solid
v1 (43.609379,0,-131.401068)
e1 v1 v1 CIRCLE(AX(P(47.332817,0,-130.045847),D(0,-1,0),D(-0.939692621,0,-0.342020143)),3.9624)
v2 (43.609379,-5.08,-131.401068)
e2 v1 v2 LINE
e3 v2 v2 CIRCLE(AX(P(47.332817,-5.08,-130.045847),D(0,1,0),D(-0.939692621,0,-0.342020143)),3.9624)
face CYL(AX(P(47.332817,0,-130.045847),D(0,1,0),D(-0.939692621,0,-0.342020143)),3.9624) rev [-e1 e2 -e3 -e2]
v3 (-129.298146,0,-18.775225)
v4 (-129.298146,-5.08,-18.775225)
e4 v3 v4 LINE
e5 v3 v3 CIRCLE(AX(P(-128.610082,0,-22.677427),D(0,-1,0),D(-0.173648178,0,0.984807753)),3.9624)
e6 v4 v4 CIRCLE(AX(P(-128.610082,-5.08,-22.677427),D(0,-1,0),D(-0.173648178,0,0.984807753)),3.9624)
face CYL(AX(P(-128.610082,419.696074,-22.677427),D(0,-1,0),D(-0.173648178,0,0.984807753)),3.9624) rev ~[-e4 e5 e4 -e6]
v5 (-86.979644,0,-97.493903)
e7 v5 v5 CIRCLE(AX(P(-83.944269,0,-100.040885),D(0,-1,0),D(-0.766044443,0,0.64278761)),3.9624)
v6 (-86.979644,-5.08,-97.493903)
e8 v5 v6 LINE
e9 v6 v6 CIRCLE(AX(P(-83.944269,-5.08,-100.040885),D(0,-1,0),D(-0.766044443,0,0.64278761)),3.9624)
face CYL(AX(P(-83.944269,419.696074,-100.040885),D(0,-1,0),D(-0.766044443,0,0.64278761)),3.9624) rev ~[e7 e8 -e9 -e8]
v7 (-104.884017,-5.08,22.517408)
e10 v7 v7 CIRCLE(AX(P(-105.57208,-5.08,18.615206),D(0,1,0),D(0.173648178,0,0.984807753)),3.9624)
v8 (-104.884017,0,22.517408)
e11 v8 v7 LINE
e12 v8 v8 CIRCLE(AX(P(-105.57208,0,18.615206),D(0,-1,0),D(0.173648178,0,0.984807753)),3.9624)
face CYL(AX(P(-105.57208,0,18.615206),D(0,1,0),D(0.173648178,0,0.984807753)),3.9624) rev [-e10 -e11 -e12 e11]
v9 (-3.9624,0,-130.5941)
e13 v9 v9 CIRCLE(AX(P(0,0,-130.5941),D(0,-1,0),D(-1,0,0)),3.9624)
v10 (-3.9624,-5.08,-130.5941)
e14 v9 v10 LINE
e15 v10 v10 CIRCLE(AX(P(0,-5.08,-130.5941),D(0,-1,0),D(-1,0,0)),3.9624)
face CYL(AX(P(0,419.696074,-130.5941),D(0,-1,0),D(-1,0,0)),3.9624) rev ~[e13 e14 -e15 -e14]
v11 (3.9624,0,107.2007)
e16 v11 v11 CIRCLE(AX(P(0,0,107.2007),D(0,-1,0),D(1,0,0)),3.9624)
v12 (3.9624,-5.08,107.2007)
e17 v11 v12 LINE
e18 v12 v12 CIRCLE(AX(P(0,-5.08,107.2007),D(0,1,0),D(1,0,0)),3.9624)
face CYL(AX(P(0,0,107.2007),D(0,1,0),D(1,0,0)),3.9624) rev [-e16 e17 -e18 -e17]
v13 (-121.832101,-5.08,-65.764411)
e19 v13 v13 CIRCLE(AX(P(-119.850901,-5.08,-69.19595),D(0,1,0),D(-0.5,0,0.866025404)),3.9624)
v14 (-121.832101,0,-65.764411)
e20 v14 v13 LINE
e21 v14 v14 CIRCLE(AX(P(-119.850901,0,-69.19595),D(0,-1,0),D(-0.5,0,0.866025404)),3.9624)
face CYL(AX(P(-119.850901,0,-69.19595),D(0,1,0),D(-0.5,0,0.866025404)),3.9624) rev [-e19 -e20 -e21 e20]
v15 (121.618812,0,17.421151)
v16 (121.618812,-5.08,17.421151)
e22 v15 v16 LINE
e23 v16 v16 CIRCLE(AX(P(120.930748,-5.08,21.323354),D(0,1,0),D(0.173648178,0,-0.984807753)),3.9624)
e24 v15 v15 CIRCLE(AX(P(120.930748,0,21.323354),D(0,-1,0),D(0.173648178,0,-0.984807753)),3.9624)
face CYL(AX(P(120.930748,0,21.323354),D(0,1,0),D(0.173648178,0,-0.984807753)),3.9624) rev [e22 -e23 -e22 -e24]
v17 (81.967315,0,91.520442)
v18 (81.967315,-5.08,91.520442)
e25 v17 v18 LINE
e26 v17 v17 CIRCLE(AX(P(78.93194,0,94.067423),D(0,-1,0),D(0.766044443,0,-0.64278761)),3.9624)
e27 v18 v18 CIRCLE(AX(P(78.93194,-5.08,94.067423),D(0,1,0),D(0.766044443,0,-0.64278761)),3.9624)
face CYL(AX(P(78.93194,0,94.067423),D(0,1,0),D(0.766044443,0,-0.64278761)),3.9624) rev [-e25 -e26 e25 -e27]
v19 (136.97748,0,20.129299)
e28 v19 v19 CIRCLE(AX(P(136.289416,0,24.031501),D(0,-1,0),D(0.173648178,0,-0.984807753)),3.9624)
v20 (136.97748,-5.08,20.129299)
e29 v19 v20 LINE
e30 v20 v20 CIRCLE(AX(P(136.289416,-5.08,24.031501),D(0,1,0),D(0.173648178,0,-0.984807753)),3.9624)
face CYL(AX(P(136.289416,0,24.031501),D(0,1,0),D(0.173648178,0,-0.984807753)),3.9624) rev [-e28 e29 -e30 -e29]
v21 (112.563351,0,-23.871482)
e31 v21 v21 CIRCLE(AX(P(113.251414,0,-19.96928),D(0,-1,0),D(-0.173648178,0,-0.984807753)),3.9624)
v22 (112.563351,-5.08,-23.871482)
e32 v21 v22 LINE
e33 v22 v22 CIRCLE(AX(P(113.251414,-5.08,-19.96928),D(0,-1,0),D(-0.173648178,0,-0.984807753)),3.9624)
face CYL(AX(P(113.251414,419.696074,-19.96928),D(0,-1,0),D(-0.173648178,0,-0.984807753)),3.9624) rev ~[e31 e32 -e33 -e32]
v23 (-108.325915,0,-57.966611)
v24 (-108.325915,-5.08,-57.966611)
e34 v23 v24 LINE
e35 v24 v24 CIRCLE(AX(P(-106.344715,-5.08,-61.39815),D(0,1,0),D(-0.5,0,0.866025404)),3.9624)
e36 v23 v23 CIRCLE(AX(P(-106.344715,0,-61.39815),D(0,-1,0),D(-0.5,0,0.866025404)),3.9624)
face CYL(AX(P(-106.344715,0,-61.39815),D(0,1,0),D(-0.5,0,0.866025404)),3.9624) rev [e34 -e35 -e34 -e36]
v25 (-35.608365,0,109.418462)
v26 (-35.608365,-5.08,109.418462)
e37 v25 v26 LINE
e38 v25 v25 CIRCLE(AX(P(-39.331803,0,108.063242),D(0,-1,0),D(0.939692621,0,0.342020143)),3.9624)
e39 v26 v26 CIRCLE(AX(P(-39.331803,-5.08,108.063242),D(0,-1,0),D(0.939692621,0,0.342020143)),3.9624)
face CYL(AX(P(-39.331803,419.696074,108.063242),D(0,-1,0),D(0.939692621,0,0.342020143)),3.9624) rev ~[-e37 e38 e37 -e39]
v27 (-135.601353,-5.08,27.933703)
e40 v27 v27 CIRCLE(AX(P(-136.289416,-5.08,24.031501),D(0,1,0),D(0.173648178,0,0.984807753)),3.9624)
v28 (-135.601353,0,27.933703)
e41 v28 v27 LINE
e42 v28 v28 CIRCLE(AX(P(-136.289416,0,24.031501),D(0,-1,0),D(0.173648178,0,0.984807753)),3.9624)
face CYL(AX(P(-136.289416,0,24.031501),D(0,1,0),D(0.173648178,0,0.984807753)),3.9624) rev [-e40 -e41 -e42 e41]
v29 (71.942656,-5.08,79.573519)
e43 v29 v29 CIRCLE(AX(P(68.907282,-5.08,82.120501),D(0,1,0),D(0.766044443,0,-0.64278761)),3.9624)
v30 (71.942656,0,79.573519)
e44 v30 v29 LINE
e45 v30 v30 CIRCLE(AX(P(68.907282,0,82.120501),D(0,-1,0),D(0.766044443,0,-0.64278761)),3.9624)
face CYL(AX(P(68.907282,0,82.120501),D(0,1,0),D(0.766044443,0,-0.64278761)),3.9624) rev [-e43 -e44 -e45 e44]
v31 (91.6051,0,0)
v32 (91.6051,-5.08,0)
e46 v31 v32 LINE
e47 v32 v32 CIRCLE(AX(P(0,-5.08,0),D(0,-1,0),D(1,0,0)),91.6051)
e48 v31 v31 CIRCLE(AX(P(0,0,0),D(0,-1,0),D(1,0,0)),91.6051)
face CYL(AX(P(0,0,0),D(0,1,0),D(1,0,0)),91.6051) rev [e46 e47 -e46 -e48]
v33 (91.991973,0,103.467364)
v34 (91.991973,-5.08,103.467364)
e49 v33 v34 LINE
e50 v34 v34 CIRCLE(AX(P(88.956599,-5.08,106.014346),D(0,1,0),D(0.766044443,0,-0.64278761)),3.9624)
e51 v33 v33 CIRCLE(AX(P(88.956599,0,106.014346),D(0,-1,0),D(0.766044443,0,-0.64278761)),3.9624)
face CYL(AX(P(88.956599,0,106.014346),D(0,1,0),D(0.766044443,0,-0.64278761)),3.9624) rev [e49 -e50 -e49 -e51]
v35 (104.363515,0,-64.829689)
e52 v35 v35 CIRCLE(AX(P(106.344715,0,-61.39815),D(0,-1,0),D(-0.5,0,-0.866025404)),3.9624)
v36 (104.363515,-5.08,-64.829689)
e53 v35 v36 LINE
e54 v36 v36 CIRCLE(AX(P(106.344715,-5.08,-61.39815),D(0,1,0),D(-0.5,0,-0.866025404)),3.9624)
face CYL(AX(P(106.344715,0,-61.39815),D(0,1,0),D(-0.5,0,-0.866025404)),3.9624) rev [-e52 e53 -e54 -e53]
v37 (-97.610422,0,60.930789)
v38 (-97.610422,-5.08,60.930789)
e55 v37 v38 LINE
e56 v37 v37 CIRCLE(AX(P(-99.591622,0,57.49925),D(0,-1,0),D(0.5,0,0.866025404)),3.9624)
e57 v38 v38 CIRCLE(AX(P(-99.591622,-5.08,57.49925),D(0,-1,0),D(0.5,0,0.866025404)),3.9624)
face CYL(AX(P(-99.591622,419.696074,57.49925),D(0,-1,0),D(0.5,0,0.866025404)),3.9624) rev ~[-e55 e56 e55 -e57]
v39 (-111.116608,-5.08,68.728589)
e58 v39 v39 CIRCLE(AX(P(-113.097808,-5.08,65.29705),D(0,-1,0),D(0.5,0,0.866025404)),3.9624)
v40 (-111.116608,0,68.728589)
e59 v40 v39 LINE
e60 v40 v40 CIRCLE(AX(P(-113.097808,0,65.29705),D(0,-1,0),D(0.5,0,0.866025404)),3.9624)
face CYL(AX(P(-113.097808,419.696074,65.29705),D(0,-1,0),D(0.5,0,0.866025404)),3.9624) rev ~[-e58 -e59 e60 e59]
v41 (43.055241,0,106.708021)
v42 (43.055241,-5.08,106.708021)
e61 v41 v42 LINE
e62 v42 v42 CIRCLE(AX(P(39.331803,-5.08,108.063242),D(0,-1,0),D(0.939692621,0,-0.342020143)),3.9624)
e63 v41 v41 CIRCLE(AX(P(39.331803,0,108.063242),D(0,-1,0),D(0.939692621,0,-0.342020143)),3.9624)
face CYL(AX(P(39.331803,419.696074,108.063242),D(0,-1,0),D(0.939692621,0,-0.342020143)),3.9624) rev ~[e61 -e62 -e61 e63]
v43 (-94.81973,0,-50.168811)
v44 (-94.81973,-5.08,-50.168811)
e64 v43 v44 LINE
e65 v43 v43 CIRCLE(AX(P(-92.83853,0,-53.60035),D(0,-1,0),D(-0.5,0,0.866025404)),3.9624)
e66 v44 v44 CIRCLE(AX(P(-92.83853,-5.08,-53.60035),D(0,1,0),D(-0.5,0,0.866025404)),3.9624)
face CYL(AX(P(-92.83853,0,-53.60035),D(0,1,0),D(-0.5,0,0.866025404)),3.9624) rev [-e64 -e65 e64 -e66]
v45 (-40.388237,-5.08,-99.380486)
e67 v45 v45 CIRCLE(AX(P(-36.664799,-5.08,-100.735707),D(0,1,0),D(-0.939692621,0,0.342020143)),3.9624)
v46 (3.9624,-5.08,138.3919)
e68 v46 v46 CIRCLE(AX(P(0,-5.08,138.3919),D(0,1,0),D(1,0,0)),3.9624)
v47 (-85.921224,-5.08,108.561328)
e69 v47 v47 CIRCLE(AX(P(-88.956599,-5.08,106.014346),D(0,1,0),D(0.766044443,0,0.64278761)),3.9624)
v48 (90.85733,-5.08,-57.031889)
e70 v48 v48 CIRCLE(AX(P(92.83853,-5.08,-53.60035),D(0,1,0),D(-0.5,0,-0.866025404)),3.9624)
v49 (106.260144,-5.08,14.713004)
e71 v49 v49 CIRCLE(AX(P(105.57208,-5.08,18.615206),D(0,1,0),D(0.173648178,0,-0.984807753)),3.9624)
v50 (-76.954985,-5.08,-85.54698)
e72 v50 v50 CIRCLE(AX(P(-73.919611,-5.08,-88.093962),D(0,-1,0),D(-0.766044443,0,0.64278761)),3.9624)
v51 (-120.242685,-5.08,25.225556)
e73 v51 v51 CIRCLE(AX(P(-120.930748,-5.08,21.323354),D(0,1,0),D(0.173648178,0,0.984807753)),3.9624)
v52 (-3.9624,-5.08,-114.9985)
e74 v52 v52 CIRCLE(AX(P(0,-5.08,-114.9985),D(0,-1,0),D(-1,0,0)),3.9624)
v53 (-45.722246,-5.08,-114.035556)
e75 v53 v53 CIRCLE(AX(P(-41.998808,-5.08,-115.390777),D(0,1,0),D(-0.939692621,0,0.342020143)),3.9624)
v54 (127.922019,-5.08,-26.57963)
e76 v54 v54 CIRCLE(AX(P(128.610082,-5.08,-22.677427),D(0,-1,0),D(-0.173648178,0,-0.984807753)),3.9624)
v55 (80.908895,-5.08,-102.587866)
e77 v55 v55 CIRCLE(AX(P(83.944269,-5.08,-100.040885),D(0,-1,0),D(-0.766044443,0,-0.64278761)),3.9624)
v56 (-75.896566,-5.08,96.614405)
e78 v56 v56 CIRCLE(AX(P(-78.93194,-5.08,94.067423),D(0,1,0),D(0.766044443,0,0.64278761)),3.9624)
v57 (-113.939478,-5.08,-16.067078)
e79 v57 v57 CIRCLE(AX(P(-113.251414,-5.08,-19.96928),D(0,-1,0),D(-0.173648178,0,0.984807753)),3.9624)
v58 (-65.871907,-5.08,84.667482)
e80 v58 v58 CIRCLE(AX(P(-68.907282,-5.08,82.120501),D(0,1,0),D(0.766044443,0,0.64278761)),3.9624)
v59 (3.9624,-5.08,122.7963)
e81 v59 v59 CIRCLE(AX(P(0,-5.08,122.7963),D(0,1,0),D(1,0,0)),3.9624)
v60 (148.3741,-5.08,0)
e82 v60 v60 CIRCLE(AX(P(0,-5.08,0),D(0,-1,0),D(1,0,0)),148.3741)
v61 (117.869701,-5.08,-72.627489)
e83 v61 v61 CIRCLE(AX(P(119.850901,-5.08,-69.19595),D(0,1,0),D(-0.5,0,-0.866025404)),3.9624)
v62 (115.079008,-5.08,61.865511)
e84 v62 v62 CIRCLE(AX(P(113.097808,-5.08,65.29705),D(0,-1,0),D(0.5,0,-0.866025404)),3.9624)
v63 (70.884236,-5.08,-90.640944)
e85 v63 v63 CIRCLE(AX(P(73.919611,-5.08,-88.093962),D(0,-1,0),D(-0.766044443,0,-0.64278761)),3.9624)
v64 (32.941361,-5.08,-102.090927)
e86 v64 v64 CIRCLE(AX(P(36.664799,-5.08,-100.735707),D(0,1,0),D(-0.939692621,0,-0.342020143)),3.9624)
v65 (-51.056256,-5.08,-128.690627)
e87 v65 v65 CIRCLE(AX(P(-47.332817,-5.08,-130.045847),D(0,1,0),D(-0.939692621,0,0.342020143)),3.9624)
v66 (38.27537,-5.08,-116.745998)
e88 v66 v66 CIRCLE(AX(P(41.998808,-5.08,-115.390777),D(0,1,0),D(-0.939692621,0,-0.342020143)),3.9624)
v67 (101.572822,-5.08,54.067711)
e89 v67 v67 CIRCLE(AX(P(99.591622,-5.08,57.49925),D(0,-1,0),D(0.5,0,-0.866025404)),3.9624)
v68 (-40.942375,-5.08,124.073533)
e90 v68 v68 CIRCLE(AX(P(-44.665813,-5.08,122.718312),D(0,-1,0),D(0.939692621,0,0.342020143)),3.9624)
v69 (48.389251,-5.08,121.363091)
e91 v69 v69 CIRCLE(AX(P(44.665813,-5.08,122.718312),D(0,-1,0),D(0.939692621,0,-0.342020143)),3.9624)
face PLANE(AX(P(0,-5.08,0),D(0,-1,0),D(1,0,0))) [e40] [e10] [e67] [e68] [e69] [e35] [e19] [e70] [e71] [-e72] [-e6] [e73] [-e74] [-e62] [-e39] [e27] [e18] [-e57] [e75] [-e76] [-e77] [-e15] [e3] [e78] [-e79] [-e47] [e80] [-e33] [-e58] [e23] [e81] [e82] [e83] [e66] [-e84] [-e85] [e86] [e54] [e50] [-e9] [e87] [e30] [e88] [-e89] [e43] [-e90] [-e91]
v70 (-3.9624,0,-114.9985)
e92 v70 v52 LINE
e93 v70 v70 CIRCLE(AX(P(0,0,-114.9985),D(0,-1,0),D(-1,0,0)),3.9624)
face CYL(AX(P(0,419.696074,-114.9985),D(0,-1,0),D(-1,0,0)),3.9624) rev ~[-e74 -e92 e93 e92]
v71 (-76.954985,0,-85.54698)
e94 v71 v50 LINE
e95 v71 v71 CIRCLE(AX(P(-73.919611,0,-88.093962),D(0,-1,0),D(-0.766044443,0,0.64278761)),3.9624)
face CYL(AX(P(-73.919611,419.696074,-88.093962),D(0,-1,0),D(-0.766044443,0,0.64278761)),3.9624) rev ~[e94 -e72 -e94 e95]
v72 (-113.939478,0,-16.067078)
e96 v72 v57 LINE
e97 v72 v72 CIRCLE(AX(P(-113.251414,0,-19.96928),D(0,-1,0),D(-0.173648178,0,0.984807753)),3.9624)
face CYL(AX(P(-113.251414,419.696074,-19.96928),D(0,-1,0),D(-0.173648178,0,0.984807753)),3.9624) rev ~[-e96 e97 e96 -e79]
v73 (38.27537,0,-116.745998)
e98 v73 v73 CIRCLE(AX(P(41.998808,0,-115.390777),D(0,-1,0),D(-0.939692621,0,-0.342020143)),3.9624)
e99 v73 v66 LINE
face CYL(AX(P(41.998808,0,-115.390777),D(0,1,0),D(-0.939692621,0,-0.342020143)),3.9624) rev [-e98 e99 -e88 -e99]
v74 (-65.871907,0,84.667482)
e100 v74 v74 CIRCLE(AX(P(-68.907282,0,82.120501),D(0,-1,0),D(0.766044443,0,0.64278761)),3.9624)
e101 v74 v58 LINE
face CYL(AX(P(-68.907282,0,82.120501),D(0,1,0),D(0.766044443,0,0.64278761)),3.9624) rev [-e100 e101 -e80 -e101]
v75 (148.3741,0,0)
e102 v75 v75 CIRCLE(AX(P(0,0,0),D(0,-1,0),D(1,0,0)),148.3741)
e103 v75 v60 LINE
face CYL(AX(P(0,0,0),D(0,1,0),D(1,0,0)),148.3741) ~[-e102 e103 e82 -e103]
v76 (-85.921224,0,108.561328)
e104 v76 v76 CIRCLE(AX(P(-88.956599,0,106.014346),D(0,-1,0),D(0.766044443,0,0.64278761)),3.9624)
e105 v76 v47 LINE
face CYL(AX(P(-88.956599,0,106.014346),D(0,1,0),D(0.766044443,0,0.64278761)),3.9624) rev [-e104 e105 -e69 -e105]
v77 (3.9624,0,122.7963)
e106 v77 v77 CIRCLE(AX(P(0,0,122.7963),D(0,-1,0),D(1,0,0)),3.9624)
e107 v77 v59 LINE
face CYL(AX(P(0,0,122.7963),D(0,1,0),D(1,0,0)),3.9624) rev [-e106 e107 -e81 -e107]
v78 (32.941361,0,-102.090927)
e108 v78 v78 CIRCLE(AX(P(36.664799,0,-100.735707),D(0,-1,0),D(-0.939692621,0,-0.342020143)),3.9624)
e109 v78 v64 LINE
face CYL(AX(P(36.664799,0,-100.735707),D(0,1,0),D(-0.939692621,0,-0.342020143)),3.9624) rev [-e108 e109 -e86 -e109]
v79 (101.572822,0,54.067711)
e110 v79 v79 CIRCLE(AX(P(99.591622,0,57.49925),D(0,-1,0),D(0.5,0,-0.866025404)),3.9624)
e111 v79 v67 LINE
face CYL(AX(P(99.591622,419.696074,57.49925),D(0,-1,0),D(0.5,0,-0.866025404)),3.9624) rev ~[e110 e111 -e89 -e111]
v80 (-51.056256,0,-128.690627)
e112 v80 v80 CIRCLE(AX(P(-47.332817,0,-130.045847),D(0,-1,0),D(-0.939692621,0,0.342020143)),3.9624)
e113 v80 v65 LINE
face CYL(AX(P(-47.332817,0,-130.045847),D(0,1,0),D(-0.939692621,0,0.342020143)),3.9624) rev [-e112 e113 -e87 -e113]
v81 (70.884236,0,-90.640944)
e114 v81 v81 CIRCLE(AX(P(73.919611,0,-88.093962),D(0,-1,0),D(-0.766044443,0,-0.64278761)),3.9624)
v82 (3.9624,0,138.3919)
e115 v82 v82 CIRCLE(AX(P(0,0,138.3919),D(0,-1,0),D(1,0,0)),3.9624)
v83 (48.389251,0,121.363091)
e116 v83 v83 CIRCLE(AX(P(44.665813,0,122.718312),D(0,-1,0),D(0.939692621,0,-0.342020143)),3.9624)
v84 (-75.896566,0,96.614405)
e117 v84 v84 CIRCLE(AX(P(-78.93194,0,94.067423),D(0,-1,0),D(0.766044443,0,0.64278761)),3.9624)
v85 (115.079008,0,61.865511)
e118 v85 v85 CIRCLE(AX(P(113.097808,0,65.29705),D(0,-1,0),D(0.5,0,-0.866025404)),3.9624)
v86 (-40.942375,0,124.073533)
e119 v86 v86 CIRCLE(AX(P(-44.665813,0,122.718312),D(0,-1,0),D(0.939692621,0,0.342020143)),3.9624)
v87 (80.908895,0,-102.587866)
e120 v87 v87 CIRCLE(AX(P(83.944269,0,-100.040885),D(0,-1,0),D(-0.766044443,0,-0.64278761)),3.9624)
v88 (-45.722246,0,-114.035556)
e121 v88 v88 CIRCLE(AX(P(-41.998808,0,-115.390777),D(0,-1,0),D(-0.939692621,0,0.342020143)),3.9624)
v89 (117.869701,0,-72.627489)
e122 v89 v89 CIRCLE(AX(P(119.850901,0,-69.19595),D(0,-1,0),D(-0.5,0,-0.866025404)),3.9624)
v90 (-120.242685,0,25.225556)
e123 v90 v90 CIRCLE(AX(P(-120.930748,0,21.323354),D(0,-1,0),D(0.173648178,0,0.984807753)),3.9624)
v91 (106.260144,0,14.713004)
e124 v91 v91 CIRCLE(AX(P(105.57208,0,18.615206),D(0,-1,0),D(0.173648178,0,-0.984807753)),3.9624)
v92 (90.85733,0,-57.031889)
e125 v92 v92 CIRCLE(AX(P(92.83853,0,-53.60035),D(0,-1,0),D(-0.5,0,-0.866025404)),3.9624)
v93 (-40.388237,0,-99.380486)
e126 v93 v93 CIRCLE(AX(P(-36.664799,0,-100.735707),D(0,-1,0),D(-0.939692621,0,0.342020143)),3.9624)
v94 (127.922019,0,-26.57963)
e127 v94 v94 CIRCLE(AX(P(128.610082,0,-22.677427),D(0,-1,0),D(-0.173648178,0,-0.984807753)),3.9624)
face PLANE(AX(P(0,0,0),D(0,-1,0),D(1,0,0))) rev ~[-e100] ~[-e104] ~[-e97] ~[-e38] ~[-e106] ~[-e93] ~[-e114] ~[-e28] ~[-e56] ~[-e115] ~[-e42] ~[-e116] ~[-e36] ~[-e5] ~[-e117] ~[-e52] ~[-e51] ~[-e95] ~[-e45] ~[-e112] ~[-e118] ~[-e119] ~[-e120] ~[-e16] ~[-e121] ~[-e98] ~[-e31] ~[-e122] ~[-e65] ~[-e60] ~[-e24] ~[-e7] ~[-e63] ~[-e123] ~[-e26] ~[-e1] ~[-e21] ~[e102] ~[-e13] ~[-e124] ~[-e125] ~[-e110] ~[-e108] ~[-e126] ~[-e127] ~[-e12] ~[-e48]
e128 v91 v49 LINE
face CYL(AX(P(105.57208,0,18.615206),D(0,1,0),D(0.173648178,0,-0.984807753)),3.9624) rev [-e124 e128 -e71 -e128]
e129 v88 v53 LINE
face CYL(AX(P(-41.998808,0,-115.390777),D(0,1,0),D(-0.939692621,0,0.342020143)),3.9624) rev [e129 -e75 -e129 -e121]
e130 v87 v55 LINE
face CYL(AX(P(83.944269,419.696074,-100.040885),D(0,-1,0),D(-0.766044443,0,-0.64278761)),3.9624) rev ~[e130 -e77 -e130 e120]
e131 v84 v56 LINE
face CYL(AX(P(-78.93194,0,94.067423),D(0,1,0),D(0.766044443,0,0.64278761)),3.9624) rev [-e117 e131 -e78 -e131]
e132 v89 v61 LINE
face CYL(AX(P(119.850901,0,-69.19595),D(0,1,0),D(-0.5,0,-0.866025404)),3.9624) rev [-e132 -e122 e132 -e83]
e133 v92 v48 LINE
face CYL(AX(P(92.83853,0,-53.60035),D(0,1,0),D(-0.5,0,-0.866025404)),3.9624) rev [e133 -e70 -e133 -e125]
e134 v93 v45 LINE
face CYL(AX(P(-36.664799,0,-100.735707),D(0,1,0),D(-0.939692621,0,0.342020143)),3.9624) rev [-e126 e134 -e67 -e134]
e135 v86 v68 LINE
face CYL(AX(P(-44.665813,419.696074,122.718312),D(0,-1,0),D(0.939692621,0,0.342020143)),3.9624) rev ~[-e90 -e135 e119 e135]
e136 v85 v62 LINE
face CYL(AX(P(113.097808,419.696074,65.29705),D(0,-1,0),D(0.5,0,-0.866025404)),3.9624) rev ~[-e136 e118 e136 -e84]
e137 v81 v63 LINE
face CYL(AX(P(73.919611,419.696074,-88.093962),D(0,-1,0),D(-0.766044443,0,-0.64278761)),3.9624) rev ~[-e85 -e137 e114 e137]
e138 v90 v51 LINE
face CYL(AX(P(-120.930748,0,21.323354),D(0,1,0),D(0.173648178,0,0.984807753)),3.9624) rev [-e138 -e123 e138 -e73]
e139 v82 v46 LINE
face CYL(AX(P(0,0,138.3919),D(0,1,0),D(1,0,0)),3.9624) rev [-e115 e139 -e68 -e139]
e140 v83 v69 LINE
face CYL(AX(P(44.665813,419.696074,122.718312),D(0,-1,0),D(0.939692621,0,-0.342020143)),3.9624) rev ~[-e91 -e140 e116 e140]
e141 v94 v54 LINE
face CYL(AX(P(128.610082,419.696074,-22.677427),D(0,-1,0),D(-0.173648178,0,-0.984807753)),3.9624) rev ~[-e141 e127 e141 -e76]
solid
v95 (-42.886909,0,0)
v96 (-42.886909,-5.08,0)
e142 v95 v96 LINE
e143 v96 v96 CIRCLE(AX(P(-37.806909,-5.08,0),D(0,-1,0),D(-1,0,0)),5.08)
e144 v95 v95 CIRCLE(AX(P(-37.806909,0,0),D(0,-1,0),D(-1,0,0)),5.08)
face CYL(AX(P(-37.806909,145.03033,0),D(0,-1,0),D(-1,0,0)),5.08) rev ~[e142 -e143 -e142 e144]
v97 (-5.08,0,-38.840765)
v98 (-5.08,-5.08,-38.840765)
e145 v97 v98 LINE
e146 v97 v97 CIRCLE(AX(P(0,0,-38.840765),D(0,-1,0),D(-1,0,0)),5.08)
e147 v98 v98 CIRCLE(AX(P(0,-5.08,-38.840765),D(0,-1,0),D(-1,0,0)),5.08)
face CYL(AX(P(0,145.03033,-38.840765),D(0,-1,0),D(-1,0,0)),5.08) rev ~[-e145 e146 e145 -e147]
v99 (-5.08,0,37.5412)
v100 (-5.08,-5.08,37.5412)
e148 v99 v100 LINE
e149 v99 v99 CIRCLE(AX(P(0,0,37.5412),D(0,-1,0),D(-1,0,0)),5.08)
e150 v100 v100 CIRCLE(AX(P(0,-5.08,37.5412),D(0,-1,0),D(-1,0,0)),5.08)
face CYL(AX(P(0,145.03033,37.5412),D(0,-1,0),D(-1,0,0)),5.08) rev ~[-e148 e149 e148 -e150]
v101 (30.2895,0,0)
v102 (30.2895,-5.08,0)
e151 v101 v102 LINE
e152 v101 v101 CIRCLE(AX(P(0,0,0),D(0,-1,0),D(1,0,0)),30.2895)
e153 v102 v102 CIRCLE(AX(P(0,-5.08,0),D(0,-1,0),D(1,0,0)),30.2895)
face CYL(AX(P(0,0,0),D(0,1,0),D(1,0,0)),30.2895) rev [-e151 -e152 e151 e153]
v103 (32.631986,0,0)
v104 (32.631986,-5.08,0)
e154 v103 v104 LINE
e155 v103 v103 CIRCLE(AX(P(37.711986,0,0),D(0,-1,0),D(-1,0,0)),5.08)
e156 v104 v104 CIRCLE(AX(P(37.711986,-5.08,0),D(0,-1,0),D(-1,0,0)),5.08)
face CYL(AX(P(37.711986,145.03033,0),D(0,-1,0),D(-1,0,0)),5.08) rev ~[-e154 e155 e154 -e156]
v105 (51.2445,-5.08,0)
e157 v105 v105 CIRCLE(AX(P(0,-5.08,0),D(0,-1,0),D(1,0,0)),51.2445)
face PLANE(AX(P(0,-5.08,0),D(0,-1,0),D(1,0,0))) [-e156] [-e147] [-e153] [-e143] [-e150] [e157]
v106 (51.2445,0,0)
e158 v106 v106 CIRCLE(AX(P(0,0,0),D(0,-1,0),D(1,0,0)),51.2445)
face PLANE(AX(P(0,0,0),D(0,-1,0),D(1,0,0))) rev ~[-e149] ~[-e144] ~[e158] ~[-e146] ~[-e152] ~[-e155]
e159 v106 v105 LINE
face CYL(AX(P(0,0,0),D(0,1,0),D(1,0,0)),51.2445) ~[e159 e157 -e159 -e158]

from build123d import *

# Parameters (mm, degrees)
F0_R            = 148.3741
F0_R_2          = 91.6051
F3_DEPTH        = 5.08
F2_R            = 3.9624
F4_DEPTH        = 5.081
F4_COPIES_COUNT = 9
F6_D            = 7.9248
F6_COPIES_COUNT = 9
F0_R_3          = 51.2445
F0_R_4          = 30.2895
F7_DEPTH        = 5.08
F8_D            = 10.16


# Not quite as in the source:
# - a pattern or mirror of a feature is missing from the dataset's text; its kind, count and spacing are read off the source's solid


with BuildPart() as f3:
    # F0 (on Front) → F3 (new body)
    with BuildSketch(Plane.XZ):
        Circle(F0_R)
        Circle(F0_R_2, mode=Mode.SUBTRACT)
    extrude(amount=F3_DEPTH)

    # F2 (on face) → F4 (cut, through all)
    with BuildSketch(Plane.XZ):
        with Locations((0, 107.2007)):
            Circle(F2_R)
        with Locations((0, 122.7963)):
            Circle(F2_R)
        with Locations((0, 138.3919)):
            Circle(F2_R)
    f4 = extrude(amount=F4_DEPTH, mode=Mode.SUBTRACT)

    # F4_copies: F4 ×9 about axis
    f4_copies_axis = Axis((0, 0, 0), (0, 1, 0))
    for i in range(1, F4_COPIES_COUNT):
        add(f4.rotate(f4_copies_axis, i * 360 / F4_COPIES_COUNT), mode=Mode.SUBTRACT)

    # F6 (through all)
    with Locations(Plane(origin=(0, 0, 0), x_dir=(1, 0, 0), z_dir=(0, 1, 0))):
        with Locations((0, 114.9985), (0, 130.5941)):
            f6 = Hole(F6_D / 2)

    # F6_copies: F6 ×9 about axis
    f6_copies_axis = Axis((0, 0, 0), (0, 1, 0))
    for i in range(1, F6_COPIES_COUNT):
        add(f6.rotate(f6_copies_axis, i * 360 / F6_COPIES_COUNT), mode=Mode.SUBTRACT)


with BuildPart() as f7:
    # F0 (on Front) → F7 (new body)
    with BuildSketch(Plane.XZ):
        Circle(F0_R_3)
        Circle(F0_R_4, mode=Mode.SUBTRACT)
    extrude(amount=F7_DEPTH)

    # F8 (through all)
    with Locations(Plane(origin=(0, 0, 0), x_dir=(1, 0, 0), z_dir=(0, 1, 0))):
        with Locations((0, -37.5412), (37.7119863628, 0), (0, 38.8407654956), (-37.8069085799, 0)):
            Hole(F8_D / 2)


solid = Compound([f3.part, f7.part])
